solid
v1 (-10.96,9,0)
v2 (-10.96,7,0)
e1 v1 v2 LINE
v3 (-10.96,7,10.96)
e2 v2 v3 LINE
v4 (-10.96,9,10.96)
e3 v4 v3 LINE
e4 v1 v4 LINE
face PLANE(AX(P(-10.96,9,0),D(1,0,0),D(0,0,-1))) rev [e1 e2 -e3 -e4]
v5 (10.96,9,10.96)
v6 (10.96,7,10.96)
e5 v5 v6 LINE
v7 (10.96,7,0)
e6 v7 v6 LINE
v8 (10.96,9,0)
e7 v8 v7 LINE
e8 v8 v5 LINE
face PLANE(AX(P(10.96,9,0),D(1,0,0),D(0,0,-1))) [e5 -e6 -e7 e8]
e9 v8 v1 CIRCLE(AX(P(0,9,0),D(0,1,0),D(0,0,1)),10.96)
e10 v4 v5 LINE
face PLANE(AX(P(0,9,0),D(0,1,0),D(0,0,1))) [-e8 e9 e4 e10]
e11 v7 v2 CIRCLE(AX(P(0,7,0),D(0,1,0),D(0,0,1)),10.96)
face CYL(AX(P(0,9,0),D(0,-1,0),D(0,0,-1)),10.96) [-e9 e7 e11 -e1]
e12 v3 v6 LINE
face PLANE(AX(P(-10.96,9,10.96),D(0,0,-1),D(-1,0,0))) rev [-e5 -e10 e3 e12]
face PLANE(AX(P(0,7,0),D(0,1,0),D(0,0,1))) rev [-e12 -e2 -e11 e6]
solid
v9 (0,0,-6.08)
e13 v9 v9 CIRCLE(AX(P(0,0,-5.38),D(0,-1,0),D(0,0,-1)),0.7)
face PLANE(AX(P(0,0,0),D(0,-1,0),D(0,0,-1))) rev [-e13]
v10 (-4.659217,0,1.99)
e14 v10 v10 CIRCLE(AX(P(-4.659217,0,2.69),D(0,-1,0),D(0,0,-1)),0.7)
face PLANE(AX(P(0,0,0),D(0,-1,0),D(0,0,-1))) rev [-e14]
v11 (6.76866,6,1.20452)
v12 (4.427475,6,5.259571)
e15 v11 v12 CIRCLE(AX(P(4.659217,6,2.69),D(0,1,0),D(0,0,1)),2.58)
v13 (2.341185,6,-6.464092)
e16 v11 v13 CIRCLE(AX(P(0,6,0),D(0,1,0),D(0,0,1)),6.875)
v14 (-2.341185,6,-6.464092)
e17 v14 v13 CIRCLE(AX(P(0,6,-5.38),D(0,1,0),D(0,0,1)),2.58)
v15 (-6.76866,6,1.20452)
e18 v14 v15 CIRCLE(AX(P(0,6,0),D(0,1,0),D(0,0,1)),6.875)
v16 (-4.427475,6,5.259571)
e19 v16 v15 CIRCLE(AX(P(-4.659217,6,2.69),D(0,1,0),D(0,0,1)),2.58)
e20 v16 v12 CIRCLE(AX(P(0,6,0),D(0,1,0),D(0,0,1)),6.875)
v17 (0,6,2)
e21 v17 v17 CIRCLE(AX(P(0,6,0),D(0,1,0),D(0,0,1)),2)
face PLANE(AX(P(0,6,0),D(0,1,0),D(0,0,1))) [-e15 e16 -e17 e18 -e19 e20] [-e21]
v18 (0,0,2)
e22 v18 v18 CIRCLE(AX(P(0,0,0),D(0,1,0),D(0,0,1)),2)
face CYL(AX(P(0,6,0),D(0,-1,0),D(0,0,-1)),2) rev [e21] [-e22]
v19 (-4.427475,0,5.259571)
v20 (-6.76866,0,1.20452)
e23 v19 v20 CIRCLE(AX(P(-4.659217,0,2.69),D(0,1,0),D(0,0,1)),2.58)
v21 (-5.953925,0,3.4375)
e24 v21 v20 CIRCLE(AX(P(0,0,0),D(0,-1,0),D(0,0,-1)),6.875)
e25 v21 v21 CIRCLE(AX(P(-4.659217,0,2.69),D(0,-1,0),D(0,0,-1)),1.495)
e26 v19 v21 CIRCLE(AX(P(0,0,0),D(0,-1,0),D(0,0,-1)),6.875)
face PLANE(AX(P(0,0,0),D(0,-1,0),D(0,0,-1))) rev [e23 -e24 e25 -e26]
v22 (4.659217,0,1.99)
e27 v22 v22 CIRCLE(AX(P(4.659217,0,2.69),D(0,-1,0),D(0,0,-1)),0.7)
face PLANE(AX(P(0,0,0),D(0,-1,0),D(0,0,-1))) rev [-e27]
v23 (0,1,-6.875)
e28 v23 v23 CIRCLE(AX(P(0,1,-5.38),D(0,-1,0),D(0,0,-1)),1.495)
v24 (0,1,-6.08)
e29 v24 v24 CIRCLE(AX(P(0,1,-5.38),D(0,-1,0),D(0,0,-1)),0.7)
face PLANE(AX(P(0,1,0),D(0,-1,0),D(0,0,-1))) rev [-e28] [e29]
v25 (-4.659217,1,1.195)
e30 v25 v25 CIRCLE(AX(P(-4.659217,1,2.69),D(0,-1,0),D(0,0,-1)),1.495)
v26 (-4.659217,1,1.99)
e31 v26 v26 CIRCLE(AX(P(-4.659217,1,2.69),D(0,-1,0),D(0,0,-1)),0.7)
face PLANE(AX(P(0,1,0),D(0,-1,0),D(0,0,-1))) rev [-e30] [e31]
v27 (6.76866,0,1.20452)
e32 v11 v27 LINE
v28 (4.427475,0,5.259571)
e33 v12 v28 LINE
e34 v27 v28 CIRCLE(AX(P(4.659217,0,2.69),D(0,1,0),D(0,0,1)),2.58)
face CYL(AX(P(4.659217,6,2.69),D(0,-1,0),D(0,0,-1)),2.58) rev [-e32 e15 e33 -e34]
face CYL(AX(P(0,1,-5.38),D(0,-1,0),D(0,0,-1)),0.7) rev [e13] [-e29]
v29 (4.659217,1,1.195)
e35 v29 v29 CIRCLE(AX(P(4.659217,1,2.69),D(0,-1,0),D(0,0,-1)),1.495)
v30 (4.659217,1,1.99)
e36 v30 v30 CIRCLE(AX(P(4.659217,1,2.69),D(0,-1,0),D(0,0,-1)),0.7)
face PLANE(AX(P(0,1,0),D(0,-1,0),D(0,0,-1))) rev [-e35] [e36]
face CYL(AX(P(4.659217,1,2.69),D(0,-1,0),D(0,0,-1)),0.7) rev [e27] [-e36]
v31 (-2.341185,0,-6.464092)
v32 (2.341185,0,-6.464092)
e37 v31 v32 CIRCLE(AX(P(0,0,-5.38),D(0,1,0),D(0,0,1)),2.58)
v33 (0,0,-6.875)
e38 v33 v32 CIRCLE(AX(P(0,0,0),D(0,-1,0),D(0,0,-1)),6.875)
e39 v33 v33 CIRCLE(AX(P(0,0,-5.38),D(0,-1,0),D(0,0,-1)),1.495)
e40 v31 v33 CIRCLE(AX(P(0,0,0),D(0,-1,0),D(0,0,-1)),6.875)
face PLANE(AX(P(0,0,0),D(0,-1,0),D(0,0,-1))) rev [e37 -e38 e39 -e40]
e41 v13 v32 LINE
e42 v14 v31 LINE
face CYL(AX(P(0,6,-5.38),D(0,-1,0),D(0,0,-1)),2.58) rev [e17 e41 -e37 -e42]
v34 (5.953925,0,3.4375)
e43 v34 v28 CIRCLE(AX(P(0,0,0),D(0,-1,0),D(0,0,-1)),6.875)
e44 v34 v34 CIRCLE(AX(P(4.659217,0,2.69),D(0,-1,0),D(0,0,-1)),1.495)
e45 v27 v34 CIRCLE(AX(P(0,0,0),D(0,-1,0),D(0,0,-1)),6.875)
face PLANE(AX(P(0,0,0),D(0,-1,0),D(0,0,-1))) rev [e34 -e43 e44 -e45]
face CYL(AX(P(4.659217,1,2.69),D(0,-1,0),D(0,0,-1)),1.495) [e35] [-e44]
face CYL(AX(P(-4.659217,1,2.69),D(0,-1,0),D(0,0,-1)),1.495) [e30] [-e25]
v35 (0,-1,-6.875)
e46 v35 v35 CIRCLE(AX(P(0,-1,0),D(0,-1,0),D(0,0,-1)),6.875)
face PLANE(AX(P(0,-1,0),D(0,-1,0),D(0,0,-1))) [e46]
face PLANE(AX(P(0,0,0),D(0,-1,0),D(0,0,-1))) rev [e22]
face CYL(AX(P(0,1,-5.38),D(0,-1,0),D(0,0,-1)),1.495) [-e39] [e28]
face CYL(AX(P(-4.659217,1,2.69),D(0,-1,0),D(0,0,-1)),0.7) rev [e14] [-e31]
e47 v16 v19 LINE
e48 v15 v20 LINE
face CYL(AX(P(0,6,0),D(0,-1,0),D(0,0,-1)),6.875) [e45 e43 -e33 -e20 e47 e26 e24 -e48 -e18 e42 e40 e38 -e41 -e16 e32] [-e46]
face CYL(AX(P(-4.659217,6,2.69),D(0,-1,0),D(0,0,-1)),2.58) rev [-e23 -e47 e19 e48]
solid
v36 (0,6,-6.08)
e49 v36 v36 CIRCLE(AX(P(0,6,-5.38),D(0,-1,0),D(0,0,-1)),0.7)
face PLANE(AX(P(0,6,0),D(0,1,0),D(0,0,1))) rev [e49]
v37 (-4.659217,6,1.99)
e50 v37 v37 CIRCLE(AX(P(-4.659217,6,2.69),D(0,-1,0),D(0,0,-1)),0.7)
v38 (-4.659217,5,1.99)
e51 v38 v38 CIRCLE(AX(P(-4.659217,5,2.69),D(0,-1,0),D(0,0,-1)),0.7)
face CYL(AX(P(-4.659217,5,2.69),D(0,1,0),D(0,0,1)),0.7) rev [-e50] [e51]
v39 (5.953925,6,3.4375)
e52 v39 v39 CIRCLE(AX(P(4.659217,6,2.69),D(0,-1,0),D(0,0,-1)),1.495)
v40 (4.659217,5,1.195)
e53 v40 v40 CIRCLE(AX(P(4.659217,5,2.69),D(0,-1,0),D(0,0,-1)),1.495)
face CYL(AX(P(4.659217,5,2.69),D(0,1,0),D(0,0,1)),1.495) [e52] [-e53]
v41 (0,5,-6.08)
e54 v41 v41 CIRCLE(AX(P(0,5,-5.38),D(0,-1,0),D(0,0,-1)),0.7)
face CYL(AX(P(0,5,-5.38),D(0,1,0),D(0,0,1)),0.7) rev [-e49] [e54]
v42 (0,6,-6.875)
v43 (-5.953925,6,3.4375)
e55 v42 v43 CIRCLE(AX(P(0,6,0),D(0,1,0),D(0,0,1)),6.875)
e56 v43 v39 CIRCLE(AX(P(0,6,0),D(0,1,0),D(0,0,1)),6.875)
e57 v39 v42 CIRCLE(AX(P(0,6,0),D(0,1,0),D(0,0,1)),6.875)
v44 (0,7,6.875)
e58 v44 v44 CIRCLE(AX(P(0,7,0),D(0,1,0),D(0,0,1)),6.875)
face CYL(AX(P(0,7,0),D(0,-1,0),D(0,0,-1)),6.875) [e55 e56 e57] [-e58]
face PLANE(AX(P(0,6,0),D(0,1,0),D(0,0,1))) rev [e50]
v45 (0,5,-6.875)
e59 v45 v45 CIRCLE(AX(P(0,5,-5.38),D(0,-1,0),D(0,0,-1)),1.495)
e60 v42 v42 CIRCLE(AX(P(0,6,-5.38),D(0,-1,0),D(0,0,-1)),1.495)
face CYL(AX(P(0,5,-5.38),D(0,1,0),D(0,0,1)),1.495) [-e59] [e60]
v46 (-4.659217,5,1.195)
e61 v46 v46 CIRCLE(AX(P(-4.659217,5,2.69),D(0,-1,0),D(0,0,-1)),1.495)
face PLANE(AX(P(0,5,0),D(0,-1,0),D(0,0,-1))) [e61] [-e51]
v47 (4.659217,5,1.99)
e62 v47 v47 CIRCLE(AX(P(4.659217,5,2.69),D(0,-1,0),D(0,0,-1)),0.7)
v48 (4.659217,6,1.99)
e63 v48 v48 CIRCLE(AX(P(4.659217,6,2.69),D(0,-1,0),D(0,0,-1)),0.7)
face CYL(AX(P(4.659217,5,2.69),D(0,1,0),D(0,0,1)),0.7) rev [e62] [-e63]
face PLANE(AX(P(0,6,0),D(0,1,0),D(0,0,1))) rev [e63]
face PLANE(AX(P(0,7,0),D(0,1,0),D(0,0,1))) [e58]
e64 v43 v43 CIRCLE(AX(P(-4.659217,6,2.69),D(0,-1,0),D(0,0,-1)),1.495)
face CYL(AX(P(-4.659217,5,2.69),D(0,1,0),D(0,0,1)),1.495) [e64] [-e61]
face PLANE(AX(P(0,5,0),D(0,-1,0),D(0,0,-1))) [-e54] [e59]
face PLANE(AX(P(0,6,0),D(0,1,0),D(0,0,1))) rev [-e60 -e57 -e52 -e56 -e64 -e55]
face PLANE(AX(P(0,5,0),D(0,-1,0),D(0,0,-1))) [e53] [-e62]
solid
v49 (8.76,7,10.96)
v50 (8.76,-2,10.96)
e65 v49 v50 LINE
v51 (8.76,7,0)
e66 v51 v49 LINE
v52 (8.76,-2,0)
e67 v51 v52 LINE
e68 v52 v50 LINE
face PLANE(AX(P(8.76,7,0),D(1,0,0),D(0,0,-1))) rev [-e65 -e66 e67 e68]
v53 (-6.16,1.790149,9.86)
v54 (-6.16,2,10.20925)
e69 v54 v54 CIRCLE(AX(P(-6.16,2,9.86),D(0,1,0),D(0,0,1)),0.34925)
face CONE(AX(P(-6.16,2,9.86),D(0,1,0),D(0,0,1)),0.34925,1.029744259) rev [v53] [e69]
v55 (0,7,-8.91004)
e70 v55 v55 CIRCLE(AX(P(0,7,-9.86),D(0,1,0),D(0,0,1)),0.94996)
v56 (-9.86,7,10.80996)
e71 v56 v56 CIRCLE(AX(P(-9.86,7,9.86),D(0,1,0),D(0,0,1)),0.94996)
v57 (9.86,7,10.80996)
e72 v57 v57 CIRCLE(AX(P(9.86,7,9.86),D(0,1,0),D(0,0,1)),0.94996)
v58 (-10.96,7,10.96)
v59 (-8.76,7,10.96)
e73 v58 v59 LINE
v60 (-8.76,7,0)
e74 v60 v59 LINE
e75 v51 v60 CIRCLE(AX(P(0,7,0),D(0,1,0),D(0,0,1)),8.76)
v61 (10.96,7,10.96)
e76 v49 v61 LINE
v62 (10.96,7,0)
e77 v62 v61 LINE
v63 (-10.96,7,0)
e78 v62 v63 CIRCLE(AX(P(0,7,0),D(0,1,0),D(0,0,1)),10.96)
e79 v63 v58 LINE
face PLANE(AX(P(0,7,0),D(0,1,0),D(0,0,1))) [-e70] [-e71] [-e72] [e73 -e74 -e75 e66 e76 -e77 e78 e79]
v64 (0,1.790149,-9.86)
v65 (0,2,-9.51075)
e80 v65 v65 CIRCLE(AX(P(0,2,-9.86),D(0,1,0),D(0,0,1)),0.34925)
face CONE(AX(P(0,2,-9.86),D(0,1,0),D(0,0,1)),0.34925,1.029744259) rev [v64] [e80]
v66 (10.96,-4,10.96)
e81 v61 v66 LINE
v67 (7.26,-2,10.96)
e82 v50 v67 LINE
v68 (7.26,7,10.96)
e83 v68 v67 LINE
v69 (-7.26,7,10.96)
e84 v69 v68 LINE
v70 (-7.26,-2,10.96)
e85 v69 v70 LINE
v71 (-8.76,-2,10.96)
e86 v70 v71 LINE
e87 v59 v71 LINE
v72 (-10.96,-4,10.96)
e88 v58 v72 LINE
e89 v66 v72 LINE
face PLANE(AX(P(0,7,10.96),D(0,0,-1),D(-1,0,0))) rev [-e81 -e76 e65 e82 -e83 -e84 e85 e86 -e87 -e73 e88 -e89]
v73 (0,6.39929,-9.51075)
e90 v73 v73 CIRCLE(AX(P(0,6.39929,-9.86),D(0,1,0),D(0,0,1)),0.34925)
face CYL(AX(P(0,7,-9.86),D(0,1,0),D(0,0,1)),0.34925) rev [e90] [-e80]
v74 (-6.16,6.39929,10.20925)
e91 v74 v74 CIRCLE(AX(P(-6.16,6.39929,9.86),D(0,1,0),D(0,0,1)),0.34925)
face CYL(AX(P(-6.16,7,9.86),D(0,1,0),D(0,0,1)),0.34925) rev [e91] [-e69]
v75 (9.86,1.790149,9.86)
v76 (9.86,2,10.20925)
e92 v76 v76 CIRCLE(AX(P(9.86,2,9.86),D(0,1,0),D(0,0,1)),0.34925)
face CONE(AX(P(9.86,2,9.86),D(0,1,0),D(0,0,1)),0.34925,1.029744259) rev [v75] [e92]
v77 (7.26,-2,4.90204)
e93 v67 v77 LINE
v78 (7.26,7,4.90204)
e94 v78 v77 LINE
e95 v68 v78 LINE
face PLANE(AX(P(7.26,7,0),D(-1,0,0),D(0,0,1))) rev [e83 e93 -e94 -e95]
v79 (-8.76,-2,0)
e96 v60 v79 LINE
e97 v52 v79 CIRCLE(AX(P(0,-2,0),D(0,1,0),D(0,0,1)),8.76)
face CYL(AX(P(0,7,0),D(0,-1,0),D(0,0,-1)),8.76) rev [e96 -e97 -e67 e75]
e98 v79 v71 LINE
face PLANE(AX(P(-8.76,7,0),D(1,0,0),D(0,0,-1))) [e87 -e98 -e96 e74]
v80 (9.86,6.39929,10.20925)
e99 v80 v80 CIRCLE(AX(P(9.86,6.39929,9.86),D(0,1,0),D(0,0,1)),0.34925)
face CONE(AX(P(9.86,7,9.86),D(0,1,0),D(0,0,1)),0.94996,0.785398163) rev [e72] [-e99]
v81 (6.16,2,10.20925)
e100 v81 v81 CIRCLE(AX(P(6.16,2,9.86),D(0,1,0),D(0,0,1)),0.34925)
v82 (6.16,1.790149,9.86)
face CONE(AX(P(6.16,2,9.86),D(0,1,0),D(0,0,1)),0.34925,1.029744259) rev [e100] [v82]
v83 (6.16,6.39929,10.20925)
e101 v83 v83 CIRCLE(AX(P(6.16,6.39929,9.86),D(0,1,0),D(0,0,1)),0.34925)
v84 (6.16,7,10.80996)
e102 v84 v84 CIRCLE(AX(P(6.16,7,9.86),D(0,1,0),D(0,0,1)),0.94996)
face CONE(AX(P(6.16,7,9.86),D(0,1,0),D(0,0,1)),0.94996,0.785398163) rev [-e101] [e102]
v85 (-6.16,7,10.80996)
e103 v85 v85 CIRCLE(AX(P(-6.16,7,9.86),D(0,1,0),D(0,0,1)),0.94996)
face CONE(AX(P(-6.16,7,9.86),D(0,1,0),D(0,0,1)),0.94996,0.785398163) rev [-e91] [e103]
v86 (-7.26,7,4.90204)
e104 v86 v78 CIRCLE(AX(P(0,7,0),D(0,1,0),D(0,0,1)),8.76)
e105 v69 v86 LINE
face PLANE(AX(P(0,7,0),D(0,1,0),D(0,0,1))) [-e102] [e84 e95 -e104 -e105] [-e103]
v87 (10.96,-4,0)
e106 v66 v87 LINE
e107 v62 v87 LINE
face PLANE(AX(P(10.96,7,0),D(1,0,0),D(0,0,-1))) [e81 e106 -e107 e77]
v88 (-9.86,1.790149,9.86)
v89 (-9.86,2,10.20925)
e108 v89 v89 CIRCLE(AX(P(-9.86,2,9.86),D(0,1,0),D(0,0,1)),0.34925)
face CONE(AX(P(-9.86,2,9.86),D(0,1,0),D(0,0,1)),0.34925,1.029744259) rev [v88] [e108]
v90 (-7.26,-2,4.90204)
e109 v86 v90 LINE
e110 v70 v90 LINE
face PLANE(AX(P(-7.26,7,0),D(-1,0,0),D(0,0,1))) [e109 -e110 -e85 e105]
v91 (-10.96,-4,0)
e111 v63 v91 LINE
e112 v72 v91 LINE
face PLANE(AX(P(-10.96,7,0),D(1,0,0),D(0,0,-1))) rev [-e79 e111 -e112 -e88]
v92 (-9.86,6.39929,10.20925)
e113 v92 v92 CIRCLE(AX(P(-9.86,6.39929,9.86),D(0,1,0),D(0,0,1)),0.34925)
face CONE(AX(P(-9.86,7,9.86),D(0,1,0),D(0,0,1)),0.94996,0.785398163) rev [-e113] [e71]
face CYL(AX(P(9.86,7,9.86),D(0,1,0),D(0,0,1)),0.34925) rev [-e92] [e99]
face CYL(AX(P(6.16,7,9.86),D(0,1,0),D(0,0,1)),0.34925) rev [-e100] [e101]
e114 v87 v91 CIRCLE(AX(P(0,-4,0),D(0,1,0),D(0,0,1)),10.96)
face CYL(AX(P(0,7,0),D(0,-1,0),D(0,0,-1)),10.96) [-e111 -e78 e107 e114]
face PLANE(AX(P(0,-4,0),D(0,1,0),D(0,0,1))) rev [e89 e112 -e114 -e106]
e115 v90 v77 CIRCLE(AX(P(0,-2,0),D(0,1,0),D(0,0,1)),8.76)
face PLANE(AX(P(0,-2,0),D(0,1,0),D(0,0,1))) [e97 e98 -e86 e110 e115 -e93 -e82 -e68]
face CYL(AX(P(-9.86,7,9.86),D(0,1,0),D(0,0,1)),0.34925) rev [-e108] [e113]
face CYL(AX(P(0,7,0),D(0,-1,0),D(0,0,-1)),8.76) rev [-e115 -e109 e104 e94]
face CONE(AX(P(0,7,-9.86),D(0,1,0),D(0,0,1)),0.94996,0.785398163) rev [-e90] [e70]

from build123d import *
from build123d.topology import SkipClean

# Parameters (mm, degrees)
BOSS_EXTRUDE1_DEPTH                       = 6
SKETCH2_R                                 = 1.495
SKETCH2_R_2                               = 0.7
BOSS_EXTRUDE2_DEPTH                       = 1
BOSS_EXTRUDE2_2_DEPTH                     = 1
BOSS_EXTRUDE2_3_DEPTH                     = 1
BOSS_EXTRUDE3_START                       = 1
SKETCH4_R                                 = 6.875
BOSS_EXTRUDE3_DEPTH                       = 1
SKETCH5_R                                 = 6.875
BOSS_EXTRUDE4_DEPTH                       = 1
BOSS_EXTRUDE5_START                       = 1
SKETCH7_R                                 = 1.495
SKETCH7_R_2                               = 0.7
BOSS_EXTRUDE5_DEPTH                       = 1
BOSS_EXTRUDE6_START                       = -2
BOSS_EXTRUDE6_DEPTH                       = 9
SKETCH9_R                                 = 10.96
SKETCH9_W                                 = 21.92
SKETCH9_H                                 = 10.96
BOSS_EXTRUDE7_DEPTH                       = 2
SKETCH10_R                                = 10.96
SKETCH10_W                                = 21.92
SKETCH10_H                                = 10.96
BOSS_EXTRUDE8_DEPTH                       = 2
CSK_FOR_0_FLAT_HEAD_MACHINE_SCREW_2_COUNT = 2
CSK_FOR_0_FLAT_HEAD_MACHINE_SCREW_2_PITCH = 3.7
CSK_FOR_0_FLAT_HEAD_MACHINE_SCREW_3_COUNT = 2
CSK_FOR_0_FLAT_HEAD_MACHINE_SCREW_3_PITCH = 16.02
CSK_FOR_0_FLAT_HEAD_MACHINE_SCREW_4_COUNT = 2
CSK_FOR_0_FLAT_HEAD_MACHINE_SCREW_4_PITCH = 19.72
CSK_FOR_0_FLAT_HEAD_MACHINE_SCREW_5_COUNT = 2
CSK_FOR_0_FLAT_HEAD_MACHINE_SCREW_5_PITCH = 22.047630258


# Read off the part's stored shape, not the designer's step: Boss-Extrude6
with BuildPart() as part:
    # Sketch1 → Boss-Extrude1 (new body)
    with BuildSketch(Plane(origin=(0, 0, 0), x_dir=(1, 0, 0), z_dir=(0, 1, 0))):
        with BuildLine():
            ThreePointArc((1.732050808, -1), (0, -2), (-1.732050808, -1))
            Line((-1.732050808, -1), (-2.424871131, -1.4))
            ThreePointArc((-2.424871131, -1.4), (-2.167128041, -2.022246864), (-2.079216672, -2.69))
            ThreePointArc((-2.079216672, -2.69), (-2.75470977, -4.430475067), (-4.427475168, -5.259571146))
            ThreePointArc((-4.427475168, -5.259571146), (0, -6.875), (4.427475168, -5.259571146))
            ThreePointArc((4.427475168, -5.259571146), (2.369136174, -3.878247159), (2.424871131, -1.4))
            Line((2.424871131, -1.4), (1.732050808, -1))
        make_face()
        with BuildLine():
            Line((0, 2.8), (0, 2))
            ThreePointArc((0, 2), (1.414213562, 1.414213562), (2, 0))
            ThreePointArc((2, 0), (1.931851653, -0.51763809), (1.732050808, -1))
            Line((1.732050808, -1), (2.424871131, -1.4))
            ThreePointArc((2.424871131, -1.4), (4.543228649, -0.112608532), (6.768659809, -1.204520397))
            ThreePointArc((6.768659809, -1.204520397), (6.848363352, -0.604602684), (6.875, 0))
            ThreePointArc((6.875, 0), (5.628555295, 3.947782959), (2.341184642, 6.464091543))
            ThreePointArc((2.341184642, 6.464091543), (2.519588893, 5.935042171), (2.58, 5.38))
            ThreePointArc((2.58, 5.38), (1.824335495, 3.555664505), (0, 2.8))
        make_face()
        with BuildLine():
            ThreePointArc((-1.732050808, -1), (-1.732050808, 1), (0, 2))
            Line((0, 2), (0, 2.8))
            ThreePointArc((0, 2.8), (-2.174092475, 3.990855691), (-2.341184642, 6.464091543))
            ThreePointArc((-2.341184642, 6.464091543), (-5.953924651, 3.4375), (-6.768659809, -1.204520397))
            ThreePointArc((-6.768659809, -1.204520397), (-4.543228649, -0.112608532), (-2.424871131, -1.4))
            Line((-2.424871131, -1.4), (-1.732050808, -1))
        make_face()
    extrude(amount=BOSS_EXTRUDE1_DEPTH)



with BuildPart() as body_2:
    # Sketch2 → Boss-Extrude2 (new body)
    with BuildSketch(Plane.XZ):
        with Locations(Location((-4.659216672, 2.69, 0), (0, 0, 270))):
            Circle(SKETCH2_R)
        with Locations(Location((-4.659216672, 2.69, 0), (0, 0, 270))):
            Circle(SKETCH2_R_2, mode=Mode.SUBTRACT)
    extrude(amount=-BOSS_EXTRUDE2_DEPTH)


with BuildPart() as body_3:
    # Sketch2 → Boss-Extrude2 2 (new body)
    with BuildSketch(Plane.XZ):
        with Locations(Location((4.659216672, 2.69, 0), (0, 0, 270))):
            Circle(SKETCH2_R)
        with Locations(Location((4.659216672, 2.69, 0), (0, 0, 270))):
            Circle(SKETCH2_R_2, mode=Mode.SUBTRACT)
    extrude(amount=-BOSS_EXTRUDE2_2_DEPTH)


with BuildPart() as body_4:
    # Sketch2 → Boss-Extrude2 3 (new body)
    with BuildSketch(Plane.XZ):
        with Locations(Location((0, -5.38, 0), (0, 0, 270))):
            Circle(SKETCH2_R)
        with Locations(Location((0, -5.38, 0), (0, 0, 270))):
            Circle(SKETCH2_R_2, mode=Mode.SUBTRACT)
    extrude(amount=-BOSS_EXTRUDE2_3_DEPTH)


with BuildPart() as part_1:
    with SkipClean():  # the faces are left unmerged after this step: merging them gives an invalid solid
        add(part.part)

        add(body_2.part)  # Boss-Extrude3 merges body 2

        add(body_3.part)  # Boss-Extrude3 merges body 3

        add(body_4.part)  # Boss-Extrude3 merges body 4
        # Sketch4 → Boss-Extrude3 (add)
        with BuildSketch(Plane.XZ.offset(BOSS_EXTRUDE3_START)):
            with Locations(Location((0, 0, 0), (0, 0, 270))):
                Circle(SKETCH4_R)
        extrude(amount=-BOSS_EXTRUDE3_DEPTH)


with BuildPart() as body_2_2:
    # Sketch5 → Boss-Extrude4 (new body)
    with BuildSketch(Plane(origin=(0, 6, 0), x_dir=(1, 0, 0), z_dir=(0, 1, 0))):
        with Locations(Location((0, 0, 0), (0, 0, 270))):
            Circle(SKETCH5_R)
    extrude(amount=BOSS_EXTRUDE4_DEPTH)

    # Sketch7 → Boss-Extrude5 (add)
    # profile 1 of 3: a face of its own
    with BuildSketch(Plane.XZ.offset(-6).offset(BOSS_EXTRUDE5_START)):
        with Locations(Location((0, -5.38, 0), (0, 0, 270))):
            Circle(SKETCH7_R)
        with Locations(Location((0, -5.38, 0), (0, 0, 270))):
            Circle(SKETCH7_R_2, mode=Mode.SUBTRACT)
    # profile 2 of 3: a face of its own
    with BuildSketch(Plane.XZ.offset(-6).offset(BOSS_EXTRUDE5_START)):
        with Locations(Location((-4.659216672, 2.69, 0), (0, 0, 149.999250854))):
            Circle(SKETCH7_R)
        with Locations(Location((-4.659216672, 2.69, 0), (0, 0, 270))):
            Circle(SKETCH7_R_2, mode=Mode.SUBTRACT)
    # profile 3 of 3: a face of its own
    with BuildSketch(Plane.XZ.offset(-6).offset(BOSS_EXTRUDE5_START)):
        with Locations(Location((4.659216672, 2.69, 0), (0, 0, 29.999250854))):
            Circle(SKETCH7_R)
        with Locations(Location((4.659216672, 2.69, 0), (0, 0, 270))):
            Circle(SKETCH7_R_2, mode=Mode.SUBTRACT)
    extrude(amount=-BOSS_EXTRUDE5_DEPTH)


with BuildPart() as body_3_2:
    # Boss-Extrude6 outline → Boss-Extrude6 (new body)
    with BuildSketch(Plane(origin=(0, 0, 0), x_dir=(1, 0, 0), z_dir=(0, 1, 0)).offset(BOSS_EXTRUDE6_START)):
        with BuildLine():
            Line((-10.96, -10.96), (-8.76, -10.96))
            Line((-8.76, -10.96), (-8.76, 0))
            ThreePointArc((-8.76, 0), (0, 8.76), (8.76, 0))
            Line((8.76, 0), (8.76, -10.96))
            Line((8.76, -10.96), (10.96, -10.96))
            Line((10.96, -10.96), (10.96, 0))
            ThreePointArc((10.96, 0), (0, 10.96), (-10.96, 0))
            Line((-10.96, 0), (-10.96, -10.96))
        make_face()
        with BuildLine():
            Line((7.26, -10.96), (7.26, -4.902040392))
            ThreePointArc((7.26, -4.902040392), (0, -8.76), (-7.26, -4.902040392))
            Line((-7.26, -4.902040392), (-7.26, -10.96))
            Line((-7.26, -10.96), (7.26, -10.96))
        make_face()
    extrude(amount=BOSS_EXTRUDE6_DEPTH)

    # Sketch9 → Boss-Extrude7 (add)
    with BuildSketch(Plane(origin=(0, -2, 0), x_dir=(1, 0, 0), z_dir=(0, 1, 0))):
        Circle(SKETCH9_R)
        with Locations((0, -5.48)):
            Rectangle(SKETCH9_W, SKETCH9_H)
    extrude(amount=-BOSS_EXTRUDE7_DEPTH)

    # Sketch15 → CSK for #0 Flat Head Machine Screw (100)5 (revolve, cut)
    with BuildSketch(Plane(origin=(-9.86, 7, 9.86), x_dir=(0, 0, 1), z_dir=(1, 0, 0))):
        Polygon((0, 0), (0, 5.209850571), (0.34925, 5), (0.34925, 0.60071), (0.94996, 0), align=None)
    csk_for_0_flat_head_machine_screw_100 = revolve(axis=Axis((-9.86, 13.35, 9.86), (0, -1, 0)), mode=Mode.SUBTRACT)

    # CSK for _0 Flat Head Machine Screw _ 2: CSK for #0 Flat Head Machine Screw (100)5 ×2
    with Locations(*[(i * CSK_FOR_0_FLAT_HEAD_MACHINE_SCREW_2_PITCH, 0, 0) for i in range(1, CSK_FOR_0_FLAT_HEAD_MACHINE_SCREW_2_COUNT)]):
        add(csk_for_0_flat_head_machine_screw_100, mode=Mode.SUBTRACT)

    # CSK for _0 Flat Head Machine Screw _ 3: CSK for #0 Flat Head Machine Screw (100)5 ×2
    with Locations(*[(i * CSK_FOR_0_FLAT_HEAD_MACHINE_SCREW_3_PITCH, 0, 0) for i in range(1, CSK_FOR_0_FLAT_HEAD_MACHINE_SCREW_3_COUNT)]):
        add(csk_for_0_flat_head_machine_screw_100, mode=Mode.SUBTRACT)

    # CSK for _0 Flat Head Machine Screw _ 4: CSK for #0 Flat Head Machine Screw (100)5 ×2
    with Locations(*[(i * CSK_FOR_0_FLAT_HEAD_MACHINE_SCREW_4_PITCH, 0, 0) for i in range(1, CSK_FOR_0_FLAT_HEAD_MACHINE_SCREW_4_COUNT)]):
        add(csk_for_0_flat_head_machine_screw_100, mode=Mode.SUBTRACT)

    # CSK for _0 Flat Head Machine Screw _ 5: CSK for #0 Flat Head Machine Screw (100)5 ×2
    with Locations(*[Vector(0.4472135954999579, 0, -0.894427190999916) * (i * CSK_FOR_0_FLAT_HEAD_MACHINE_SCREW_5_PITCH) for i in range(1, CSK_FOR_0_FLAT_HEAD_MACHINE_SCREW_5_COUNT)]):
        add(csk_for_0_flat_head_machine_screw_100, mode=Mode.SUBTRACT)


with BuildPart() as body_4_2:
    # Sketch10 → Boss-Extrude8 (new body)
    with BuildSketch(Plane(origin=(0, 7, 0), x_dir=(1, 0, 0), z_dir=(0, 1, 0))):
        Circle(SKETCH10_R)
        with Locations((0, -5.48)):
            Rectangle(SKETCH10_W, SKETCH10_H)
    extrude(amount=BOSS_EXTRUDE8_DEPTH)


solid = Compound([part_1.part, body_2_2.part, body_3_2.part, body_4_2.part])
